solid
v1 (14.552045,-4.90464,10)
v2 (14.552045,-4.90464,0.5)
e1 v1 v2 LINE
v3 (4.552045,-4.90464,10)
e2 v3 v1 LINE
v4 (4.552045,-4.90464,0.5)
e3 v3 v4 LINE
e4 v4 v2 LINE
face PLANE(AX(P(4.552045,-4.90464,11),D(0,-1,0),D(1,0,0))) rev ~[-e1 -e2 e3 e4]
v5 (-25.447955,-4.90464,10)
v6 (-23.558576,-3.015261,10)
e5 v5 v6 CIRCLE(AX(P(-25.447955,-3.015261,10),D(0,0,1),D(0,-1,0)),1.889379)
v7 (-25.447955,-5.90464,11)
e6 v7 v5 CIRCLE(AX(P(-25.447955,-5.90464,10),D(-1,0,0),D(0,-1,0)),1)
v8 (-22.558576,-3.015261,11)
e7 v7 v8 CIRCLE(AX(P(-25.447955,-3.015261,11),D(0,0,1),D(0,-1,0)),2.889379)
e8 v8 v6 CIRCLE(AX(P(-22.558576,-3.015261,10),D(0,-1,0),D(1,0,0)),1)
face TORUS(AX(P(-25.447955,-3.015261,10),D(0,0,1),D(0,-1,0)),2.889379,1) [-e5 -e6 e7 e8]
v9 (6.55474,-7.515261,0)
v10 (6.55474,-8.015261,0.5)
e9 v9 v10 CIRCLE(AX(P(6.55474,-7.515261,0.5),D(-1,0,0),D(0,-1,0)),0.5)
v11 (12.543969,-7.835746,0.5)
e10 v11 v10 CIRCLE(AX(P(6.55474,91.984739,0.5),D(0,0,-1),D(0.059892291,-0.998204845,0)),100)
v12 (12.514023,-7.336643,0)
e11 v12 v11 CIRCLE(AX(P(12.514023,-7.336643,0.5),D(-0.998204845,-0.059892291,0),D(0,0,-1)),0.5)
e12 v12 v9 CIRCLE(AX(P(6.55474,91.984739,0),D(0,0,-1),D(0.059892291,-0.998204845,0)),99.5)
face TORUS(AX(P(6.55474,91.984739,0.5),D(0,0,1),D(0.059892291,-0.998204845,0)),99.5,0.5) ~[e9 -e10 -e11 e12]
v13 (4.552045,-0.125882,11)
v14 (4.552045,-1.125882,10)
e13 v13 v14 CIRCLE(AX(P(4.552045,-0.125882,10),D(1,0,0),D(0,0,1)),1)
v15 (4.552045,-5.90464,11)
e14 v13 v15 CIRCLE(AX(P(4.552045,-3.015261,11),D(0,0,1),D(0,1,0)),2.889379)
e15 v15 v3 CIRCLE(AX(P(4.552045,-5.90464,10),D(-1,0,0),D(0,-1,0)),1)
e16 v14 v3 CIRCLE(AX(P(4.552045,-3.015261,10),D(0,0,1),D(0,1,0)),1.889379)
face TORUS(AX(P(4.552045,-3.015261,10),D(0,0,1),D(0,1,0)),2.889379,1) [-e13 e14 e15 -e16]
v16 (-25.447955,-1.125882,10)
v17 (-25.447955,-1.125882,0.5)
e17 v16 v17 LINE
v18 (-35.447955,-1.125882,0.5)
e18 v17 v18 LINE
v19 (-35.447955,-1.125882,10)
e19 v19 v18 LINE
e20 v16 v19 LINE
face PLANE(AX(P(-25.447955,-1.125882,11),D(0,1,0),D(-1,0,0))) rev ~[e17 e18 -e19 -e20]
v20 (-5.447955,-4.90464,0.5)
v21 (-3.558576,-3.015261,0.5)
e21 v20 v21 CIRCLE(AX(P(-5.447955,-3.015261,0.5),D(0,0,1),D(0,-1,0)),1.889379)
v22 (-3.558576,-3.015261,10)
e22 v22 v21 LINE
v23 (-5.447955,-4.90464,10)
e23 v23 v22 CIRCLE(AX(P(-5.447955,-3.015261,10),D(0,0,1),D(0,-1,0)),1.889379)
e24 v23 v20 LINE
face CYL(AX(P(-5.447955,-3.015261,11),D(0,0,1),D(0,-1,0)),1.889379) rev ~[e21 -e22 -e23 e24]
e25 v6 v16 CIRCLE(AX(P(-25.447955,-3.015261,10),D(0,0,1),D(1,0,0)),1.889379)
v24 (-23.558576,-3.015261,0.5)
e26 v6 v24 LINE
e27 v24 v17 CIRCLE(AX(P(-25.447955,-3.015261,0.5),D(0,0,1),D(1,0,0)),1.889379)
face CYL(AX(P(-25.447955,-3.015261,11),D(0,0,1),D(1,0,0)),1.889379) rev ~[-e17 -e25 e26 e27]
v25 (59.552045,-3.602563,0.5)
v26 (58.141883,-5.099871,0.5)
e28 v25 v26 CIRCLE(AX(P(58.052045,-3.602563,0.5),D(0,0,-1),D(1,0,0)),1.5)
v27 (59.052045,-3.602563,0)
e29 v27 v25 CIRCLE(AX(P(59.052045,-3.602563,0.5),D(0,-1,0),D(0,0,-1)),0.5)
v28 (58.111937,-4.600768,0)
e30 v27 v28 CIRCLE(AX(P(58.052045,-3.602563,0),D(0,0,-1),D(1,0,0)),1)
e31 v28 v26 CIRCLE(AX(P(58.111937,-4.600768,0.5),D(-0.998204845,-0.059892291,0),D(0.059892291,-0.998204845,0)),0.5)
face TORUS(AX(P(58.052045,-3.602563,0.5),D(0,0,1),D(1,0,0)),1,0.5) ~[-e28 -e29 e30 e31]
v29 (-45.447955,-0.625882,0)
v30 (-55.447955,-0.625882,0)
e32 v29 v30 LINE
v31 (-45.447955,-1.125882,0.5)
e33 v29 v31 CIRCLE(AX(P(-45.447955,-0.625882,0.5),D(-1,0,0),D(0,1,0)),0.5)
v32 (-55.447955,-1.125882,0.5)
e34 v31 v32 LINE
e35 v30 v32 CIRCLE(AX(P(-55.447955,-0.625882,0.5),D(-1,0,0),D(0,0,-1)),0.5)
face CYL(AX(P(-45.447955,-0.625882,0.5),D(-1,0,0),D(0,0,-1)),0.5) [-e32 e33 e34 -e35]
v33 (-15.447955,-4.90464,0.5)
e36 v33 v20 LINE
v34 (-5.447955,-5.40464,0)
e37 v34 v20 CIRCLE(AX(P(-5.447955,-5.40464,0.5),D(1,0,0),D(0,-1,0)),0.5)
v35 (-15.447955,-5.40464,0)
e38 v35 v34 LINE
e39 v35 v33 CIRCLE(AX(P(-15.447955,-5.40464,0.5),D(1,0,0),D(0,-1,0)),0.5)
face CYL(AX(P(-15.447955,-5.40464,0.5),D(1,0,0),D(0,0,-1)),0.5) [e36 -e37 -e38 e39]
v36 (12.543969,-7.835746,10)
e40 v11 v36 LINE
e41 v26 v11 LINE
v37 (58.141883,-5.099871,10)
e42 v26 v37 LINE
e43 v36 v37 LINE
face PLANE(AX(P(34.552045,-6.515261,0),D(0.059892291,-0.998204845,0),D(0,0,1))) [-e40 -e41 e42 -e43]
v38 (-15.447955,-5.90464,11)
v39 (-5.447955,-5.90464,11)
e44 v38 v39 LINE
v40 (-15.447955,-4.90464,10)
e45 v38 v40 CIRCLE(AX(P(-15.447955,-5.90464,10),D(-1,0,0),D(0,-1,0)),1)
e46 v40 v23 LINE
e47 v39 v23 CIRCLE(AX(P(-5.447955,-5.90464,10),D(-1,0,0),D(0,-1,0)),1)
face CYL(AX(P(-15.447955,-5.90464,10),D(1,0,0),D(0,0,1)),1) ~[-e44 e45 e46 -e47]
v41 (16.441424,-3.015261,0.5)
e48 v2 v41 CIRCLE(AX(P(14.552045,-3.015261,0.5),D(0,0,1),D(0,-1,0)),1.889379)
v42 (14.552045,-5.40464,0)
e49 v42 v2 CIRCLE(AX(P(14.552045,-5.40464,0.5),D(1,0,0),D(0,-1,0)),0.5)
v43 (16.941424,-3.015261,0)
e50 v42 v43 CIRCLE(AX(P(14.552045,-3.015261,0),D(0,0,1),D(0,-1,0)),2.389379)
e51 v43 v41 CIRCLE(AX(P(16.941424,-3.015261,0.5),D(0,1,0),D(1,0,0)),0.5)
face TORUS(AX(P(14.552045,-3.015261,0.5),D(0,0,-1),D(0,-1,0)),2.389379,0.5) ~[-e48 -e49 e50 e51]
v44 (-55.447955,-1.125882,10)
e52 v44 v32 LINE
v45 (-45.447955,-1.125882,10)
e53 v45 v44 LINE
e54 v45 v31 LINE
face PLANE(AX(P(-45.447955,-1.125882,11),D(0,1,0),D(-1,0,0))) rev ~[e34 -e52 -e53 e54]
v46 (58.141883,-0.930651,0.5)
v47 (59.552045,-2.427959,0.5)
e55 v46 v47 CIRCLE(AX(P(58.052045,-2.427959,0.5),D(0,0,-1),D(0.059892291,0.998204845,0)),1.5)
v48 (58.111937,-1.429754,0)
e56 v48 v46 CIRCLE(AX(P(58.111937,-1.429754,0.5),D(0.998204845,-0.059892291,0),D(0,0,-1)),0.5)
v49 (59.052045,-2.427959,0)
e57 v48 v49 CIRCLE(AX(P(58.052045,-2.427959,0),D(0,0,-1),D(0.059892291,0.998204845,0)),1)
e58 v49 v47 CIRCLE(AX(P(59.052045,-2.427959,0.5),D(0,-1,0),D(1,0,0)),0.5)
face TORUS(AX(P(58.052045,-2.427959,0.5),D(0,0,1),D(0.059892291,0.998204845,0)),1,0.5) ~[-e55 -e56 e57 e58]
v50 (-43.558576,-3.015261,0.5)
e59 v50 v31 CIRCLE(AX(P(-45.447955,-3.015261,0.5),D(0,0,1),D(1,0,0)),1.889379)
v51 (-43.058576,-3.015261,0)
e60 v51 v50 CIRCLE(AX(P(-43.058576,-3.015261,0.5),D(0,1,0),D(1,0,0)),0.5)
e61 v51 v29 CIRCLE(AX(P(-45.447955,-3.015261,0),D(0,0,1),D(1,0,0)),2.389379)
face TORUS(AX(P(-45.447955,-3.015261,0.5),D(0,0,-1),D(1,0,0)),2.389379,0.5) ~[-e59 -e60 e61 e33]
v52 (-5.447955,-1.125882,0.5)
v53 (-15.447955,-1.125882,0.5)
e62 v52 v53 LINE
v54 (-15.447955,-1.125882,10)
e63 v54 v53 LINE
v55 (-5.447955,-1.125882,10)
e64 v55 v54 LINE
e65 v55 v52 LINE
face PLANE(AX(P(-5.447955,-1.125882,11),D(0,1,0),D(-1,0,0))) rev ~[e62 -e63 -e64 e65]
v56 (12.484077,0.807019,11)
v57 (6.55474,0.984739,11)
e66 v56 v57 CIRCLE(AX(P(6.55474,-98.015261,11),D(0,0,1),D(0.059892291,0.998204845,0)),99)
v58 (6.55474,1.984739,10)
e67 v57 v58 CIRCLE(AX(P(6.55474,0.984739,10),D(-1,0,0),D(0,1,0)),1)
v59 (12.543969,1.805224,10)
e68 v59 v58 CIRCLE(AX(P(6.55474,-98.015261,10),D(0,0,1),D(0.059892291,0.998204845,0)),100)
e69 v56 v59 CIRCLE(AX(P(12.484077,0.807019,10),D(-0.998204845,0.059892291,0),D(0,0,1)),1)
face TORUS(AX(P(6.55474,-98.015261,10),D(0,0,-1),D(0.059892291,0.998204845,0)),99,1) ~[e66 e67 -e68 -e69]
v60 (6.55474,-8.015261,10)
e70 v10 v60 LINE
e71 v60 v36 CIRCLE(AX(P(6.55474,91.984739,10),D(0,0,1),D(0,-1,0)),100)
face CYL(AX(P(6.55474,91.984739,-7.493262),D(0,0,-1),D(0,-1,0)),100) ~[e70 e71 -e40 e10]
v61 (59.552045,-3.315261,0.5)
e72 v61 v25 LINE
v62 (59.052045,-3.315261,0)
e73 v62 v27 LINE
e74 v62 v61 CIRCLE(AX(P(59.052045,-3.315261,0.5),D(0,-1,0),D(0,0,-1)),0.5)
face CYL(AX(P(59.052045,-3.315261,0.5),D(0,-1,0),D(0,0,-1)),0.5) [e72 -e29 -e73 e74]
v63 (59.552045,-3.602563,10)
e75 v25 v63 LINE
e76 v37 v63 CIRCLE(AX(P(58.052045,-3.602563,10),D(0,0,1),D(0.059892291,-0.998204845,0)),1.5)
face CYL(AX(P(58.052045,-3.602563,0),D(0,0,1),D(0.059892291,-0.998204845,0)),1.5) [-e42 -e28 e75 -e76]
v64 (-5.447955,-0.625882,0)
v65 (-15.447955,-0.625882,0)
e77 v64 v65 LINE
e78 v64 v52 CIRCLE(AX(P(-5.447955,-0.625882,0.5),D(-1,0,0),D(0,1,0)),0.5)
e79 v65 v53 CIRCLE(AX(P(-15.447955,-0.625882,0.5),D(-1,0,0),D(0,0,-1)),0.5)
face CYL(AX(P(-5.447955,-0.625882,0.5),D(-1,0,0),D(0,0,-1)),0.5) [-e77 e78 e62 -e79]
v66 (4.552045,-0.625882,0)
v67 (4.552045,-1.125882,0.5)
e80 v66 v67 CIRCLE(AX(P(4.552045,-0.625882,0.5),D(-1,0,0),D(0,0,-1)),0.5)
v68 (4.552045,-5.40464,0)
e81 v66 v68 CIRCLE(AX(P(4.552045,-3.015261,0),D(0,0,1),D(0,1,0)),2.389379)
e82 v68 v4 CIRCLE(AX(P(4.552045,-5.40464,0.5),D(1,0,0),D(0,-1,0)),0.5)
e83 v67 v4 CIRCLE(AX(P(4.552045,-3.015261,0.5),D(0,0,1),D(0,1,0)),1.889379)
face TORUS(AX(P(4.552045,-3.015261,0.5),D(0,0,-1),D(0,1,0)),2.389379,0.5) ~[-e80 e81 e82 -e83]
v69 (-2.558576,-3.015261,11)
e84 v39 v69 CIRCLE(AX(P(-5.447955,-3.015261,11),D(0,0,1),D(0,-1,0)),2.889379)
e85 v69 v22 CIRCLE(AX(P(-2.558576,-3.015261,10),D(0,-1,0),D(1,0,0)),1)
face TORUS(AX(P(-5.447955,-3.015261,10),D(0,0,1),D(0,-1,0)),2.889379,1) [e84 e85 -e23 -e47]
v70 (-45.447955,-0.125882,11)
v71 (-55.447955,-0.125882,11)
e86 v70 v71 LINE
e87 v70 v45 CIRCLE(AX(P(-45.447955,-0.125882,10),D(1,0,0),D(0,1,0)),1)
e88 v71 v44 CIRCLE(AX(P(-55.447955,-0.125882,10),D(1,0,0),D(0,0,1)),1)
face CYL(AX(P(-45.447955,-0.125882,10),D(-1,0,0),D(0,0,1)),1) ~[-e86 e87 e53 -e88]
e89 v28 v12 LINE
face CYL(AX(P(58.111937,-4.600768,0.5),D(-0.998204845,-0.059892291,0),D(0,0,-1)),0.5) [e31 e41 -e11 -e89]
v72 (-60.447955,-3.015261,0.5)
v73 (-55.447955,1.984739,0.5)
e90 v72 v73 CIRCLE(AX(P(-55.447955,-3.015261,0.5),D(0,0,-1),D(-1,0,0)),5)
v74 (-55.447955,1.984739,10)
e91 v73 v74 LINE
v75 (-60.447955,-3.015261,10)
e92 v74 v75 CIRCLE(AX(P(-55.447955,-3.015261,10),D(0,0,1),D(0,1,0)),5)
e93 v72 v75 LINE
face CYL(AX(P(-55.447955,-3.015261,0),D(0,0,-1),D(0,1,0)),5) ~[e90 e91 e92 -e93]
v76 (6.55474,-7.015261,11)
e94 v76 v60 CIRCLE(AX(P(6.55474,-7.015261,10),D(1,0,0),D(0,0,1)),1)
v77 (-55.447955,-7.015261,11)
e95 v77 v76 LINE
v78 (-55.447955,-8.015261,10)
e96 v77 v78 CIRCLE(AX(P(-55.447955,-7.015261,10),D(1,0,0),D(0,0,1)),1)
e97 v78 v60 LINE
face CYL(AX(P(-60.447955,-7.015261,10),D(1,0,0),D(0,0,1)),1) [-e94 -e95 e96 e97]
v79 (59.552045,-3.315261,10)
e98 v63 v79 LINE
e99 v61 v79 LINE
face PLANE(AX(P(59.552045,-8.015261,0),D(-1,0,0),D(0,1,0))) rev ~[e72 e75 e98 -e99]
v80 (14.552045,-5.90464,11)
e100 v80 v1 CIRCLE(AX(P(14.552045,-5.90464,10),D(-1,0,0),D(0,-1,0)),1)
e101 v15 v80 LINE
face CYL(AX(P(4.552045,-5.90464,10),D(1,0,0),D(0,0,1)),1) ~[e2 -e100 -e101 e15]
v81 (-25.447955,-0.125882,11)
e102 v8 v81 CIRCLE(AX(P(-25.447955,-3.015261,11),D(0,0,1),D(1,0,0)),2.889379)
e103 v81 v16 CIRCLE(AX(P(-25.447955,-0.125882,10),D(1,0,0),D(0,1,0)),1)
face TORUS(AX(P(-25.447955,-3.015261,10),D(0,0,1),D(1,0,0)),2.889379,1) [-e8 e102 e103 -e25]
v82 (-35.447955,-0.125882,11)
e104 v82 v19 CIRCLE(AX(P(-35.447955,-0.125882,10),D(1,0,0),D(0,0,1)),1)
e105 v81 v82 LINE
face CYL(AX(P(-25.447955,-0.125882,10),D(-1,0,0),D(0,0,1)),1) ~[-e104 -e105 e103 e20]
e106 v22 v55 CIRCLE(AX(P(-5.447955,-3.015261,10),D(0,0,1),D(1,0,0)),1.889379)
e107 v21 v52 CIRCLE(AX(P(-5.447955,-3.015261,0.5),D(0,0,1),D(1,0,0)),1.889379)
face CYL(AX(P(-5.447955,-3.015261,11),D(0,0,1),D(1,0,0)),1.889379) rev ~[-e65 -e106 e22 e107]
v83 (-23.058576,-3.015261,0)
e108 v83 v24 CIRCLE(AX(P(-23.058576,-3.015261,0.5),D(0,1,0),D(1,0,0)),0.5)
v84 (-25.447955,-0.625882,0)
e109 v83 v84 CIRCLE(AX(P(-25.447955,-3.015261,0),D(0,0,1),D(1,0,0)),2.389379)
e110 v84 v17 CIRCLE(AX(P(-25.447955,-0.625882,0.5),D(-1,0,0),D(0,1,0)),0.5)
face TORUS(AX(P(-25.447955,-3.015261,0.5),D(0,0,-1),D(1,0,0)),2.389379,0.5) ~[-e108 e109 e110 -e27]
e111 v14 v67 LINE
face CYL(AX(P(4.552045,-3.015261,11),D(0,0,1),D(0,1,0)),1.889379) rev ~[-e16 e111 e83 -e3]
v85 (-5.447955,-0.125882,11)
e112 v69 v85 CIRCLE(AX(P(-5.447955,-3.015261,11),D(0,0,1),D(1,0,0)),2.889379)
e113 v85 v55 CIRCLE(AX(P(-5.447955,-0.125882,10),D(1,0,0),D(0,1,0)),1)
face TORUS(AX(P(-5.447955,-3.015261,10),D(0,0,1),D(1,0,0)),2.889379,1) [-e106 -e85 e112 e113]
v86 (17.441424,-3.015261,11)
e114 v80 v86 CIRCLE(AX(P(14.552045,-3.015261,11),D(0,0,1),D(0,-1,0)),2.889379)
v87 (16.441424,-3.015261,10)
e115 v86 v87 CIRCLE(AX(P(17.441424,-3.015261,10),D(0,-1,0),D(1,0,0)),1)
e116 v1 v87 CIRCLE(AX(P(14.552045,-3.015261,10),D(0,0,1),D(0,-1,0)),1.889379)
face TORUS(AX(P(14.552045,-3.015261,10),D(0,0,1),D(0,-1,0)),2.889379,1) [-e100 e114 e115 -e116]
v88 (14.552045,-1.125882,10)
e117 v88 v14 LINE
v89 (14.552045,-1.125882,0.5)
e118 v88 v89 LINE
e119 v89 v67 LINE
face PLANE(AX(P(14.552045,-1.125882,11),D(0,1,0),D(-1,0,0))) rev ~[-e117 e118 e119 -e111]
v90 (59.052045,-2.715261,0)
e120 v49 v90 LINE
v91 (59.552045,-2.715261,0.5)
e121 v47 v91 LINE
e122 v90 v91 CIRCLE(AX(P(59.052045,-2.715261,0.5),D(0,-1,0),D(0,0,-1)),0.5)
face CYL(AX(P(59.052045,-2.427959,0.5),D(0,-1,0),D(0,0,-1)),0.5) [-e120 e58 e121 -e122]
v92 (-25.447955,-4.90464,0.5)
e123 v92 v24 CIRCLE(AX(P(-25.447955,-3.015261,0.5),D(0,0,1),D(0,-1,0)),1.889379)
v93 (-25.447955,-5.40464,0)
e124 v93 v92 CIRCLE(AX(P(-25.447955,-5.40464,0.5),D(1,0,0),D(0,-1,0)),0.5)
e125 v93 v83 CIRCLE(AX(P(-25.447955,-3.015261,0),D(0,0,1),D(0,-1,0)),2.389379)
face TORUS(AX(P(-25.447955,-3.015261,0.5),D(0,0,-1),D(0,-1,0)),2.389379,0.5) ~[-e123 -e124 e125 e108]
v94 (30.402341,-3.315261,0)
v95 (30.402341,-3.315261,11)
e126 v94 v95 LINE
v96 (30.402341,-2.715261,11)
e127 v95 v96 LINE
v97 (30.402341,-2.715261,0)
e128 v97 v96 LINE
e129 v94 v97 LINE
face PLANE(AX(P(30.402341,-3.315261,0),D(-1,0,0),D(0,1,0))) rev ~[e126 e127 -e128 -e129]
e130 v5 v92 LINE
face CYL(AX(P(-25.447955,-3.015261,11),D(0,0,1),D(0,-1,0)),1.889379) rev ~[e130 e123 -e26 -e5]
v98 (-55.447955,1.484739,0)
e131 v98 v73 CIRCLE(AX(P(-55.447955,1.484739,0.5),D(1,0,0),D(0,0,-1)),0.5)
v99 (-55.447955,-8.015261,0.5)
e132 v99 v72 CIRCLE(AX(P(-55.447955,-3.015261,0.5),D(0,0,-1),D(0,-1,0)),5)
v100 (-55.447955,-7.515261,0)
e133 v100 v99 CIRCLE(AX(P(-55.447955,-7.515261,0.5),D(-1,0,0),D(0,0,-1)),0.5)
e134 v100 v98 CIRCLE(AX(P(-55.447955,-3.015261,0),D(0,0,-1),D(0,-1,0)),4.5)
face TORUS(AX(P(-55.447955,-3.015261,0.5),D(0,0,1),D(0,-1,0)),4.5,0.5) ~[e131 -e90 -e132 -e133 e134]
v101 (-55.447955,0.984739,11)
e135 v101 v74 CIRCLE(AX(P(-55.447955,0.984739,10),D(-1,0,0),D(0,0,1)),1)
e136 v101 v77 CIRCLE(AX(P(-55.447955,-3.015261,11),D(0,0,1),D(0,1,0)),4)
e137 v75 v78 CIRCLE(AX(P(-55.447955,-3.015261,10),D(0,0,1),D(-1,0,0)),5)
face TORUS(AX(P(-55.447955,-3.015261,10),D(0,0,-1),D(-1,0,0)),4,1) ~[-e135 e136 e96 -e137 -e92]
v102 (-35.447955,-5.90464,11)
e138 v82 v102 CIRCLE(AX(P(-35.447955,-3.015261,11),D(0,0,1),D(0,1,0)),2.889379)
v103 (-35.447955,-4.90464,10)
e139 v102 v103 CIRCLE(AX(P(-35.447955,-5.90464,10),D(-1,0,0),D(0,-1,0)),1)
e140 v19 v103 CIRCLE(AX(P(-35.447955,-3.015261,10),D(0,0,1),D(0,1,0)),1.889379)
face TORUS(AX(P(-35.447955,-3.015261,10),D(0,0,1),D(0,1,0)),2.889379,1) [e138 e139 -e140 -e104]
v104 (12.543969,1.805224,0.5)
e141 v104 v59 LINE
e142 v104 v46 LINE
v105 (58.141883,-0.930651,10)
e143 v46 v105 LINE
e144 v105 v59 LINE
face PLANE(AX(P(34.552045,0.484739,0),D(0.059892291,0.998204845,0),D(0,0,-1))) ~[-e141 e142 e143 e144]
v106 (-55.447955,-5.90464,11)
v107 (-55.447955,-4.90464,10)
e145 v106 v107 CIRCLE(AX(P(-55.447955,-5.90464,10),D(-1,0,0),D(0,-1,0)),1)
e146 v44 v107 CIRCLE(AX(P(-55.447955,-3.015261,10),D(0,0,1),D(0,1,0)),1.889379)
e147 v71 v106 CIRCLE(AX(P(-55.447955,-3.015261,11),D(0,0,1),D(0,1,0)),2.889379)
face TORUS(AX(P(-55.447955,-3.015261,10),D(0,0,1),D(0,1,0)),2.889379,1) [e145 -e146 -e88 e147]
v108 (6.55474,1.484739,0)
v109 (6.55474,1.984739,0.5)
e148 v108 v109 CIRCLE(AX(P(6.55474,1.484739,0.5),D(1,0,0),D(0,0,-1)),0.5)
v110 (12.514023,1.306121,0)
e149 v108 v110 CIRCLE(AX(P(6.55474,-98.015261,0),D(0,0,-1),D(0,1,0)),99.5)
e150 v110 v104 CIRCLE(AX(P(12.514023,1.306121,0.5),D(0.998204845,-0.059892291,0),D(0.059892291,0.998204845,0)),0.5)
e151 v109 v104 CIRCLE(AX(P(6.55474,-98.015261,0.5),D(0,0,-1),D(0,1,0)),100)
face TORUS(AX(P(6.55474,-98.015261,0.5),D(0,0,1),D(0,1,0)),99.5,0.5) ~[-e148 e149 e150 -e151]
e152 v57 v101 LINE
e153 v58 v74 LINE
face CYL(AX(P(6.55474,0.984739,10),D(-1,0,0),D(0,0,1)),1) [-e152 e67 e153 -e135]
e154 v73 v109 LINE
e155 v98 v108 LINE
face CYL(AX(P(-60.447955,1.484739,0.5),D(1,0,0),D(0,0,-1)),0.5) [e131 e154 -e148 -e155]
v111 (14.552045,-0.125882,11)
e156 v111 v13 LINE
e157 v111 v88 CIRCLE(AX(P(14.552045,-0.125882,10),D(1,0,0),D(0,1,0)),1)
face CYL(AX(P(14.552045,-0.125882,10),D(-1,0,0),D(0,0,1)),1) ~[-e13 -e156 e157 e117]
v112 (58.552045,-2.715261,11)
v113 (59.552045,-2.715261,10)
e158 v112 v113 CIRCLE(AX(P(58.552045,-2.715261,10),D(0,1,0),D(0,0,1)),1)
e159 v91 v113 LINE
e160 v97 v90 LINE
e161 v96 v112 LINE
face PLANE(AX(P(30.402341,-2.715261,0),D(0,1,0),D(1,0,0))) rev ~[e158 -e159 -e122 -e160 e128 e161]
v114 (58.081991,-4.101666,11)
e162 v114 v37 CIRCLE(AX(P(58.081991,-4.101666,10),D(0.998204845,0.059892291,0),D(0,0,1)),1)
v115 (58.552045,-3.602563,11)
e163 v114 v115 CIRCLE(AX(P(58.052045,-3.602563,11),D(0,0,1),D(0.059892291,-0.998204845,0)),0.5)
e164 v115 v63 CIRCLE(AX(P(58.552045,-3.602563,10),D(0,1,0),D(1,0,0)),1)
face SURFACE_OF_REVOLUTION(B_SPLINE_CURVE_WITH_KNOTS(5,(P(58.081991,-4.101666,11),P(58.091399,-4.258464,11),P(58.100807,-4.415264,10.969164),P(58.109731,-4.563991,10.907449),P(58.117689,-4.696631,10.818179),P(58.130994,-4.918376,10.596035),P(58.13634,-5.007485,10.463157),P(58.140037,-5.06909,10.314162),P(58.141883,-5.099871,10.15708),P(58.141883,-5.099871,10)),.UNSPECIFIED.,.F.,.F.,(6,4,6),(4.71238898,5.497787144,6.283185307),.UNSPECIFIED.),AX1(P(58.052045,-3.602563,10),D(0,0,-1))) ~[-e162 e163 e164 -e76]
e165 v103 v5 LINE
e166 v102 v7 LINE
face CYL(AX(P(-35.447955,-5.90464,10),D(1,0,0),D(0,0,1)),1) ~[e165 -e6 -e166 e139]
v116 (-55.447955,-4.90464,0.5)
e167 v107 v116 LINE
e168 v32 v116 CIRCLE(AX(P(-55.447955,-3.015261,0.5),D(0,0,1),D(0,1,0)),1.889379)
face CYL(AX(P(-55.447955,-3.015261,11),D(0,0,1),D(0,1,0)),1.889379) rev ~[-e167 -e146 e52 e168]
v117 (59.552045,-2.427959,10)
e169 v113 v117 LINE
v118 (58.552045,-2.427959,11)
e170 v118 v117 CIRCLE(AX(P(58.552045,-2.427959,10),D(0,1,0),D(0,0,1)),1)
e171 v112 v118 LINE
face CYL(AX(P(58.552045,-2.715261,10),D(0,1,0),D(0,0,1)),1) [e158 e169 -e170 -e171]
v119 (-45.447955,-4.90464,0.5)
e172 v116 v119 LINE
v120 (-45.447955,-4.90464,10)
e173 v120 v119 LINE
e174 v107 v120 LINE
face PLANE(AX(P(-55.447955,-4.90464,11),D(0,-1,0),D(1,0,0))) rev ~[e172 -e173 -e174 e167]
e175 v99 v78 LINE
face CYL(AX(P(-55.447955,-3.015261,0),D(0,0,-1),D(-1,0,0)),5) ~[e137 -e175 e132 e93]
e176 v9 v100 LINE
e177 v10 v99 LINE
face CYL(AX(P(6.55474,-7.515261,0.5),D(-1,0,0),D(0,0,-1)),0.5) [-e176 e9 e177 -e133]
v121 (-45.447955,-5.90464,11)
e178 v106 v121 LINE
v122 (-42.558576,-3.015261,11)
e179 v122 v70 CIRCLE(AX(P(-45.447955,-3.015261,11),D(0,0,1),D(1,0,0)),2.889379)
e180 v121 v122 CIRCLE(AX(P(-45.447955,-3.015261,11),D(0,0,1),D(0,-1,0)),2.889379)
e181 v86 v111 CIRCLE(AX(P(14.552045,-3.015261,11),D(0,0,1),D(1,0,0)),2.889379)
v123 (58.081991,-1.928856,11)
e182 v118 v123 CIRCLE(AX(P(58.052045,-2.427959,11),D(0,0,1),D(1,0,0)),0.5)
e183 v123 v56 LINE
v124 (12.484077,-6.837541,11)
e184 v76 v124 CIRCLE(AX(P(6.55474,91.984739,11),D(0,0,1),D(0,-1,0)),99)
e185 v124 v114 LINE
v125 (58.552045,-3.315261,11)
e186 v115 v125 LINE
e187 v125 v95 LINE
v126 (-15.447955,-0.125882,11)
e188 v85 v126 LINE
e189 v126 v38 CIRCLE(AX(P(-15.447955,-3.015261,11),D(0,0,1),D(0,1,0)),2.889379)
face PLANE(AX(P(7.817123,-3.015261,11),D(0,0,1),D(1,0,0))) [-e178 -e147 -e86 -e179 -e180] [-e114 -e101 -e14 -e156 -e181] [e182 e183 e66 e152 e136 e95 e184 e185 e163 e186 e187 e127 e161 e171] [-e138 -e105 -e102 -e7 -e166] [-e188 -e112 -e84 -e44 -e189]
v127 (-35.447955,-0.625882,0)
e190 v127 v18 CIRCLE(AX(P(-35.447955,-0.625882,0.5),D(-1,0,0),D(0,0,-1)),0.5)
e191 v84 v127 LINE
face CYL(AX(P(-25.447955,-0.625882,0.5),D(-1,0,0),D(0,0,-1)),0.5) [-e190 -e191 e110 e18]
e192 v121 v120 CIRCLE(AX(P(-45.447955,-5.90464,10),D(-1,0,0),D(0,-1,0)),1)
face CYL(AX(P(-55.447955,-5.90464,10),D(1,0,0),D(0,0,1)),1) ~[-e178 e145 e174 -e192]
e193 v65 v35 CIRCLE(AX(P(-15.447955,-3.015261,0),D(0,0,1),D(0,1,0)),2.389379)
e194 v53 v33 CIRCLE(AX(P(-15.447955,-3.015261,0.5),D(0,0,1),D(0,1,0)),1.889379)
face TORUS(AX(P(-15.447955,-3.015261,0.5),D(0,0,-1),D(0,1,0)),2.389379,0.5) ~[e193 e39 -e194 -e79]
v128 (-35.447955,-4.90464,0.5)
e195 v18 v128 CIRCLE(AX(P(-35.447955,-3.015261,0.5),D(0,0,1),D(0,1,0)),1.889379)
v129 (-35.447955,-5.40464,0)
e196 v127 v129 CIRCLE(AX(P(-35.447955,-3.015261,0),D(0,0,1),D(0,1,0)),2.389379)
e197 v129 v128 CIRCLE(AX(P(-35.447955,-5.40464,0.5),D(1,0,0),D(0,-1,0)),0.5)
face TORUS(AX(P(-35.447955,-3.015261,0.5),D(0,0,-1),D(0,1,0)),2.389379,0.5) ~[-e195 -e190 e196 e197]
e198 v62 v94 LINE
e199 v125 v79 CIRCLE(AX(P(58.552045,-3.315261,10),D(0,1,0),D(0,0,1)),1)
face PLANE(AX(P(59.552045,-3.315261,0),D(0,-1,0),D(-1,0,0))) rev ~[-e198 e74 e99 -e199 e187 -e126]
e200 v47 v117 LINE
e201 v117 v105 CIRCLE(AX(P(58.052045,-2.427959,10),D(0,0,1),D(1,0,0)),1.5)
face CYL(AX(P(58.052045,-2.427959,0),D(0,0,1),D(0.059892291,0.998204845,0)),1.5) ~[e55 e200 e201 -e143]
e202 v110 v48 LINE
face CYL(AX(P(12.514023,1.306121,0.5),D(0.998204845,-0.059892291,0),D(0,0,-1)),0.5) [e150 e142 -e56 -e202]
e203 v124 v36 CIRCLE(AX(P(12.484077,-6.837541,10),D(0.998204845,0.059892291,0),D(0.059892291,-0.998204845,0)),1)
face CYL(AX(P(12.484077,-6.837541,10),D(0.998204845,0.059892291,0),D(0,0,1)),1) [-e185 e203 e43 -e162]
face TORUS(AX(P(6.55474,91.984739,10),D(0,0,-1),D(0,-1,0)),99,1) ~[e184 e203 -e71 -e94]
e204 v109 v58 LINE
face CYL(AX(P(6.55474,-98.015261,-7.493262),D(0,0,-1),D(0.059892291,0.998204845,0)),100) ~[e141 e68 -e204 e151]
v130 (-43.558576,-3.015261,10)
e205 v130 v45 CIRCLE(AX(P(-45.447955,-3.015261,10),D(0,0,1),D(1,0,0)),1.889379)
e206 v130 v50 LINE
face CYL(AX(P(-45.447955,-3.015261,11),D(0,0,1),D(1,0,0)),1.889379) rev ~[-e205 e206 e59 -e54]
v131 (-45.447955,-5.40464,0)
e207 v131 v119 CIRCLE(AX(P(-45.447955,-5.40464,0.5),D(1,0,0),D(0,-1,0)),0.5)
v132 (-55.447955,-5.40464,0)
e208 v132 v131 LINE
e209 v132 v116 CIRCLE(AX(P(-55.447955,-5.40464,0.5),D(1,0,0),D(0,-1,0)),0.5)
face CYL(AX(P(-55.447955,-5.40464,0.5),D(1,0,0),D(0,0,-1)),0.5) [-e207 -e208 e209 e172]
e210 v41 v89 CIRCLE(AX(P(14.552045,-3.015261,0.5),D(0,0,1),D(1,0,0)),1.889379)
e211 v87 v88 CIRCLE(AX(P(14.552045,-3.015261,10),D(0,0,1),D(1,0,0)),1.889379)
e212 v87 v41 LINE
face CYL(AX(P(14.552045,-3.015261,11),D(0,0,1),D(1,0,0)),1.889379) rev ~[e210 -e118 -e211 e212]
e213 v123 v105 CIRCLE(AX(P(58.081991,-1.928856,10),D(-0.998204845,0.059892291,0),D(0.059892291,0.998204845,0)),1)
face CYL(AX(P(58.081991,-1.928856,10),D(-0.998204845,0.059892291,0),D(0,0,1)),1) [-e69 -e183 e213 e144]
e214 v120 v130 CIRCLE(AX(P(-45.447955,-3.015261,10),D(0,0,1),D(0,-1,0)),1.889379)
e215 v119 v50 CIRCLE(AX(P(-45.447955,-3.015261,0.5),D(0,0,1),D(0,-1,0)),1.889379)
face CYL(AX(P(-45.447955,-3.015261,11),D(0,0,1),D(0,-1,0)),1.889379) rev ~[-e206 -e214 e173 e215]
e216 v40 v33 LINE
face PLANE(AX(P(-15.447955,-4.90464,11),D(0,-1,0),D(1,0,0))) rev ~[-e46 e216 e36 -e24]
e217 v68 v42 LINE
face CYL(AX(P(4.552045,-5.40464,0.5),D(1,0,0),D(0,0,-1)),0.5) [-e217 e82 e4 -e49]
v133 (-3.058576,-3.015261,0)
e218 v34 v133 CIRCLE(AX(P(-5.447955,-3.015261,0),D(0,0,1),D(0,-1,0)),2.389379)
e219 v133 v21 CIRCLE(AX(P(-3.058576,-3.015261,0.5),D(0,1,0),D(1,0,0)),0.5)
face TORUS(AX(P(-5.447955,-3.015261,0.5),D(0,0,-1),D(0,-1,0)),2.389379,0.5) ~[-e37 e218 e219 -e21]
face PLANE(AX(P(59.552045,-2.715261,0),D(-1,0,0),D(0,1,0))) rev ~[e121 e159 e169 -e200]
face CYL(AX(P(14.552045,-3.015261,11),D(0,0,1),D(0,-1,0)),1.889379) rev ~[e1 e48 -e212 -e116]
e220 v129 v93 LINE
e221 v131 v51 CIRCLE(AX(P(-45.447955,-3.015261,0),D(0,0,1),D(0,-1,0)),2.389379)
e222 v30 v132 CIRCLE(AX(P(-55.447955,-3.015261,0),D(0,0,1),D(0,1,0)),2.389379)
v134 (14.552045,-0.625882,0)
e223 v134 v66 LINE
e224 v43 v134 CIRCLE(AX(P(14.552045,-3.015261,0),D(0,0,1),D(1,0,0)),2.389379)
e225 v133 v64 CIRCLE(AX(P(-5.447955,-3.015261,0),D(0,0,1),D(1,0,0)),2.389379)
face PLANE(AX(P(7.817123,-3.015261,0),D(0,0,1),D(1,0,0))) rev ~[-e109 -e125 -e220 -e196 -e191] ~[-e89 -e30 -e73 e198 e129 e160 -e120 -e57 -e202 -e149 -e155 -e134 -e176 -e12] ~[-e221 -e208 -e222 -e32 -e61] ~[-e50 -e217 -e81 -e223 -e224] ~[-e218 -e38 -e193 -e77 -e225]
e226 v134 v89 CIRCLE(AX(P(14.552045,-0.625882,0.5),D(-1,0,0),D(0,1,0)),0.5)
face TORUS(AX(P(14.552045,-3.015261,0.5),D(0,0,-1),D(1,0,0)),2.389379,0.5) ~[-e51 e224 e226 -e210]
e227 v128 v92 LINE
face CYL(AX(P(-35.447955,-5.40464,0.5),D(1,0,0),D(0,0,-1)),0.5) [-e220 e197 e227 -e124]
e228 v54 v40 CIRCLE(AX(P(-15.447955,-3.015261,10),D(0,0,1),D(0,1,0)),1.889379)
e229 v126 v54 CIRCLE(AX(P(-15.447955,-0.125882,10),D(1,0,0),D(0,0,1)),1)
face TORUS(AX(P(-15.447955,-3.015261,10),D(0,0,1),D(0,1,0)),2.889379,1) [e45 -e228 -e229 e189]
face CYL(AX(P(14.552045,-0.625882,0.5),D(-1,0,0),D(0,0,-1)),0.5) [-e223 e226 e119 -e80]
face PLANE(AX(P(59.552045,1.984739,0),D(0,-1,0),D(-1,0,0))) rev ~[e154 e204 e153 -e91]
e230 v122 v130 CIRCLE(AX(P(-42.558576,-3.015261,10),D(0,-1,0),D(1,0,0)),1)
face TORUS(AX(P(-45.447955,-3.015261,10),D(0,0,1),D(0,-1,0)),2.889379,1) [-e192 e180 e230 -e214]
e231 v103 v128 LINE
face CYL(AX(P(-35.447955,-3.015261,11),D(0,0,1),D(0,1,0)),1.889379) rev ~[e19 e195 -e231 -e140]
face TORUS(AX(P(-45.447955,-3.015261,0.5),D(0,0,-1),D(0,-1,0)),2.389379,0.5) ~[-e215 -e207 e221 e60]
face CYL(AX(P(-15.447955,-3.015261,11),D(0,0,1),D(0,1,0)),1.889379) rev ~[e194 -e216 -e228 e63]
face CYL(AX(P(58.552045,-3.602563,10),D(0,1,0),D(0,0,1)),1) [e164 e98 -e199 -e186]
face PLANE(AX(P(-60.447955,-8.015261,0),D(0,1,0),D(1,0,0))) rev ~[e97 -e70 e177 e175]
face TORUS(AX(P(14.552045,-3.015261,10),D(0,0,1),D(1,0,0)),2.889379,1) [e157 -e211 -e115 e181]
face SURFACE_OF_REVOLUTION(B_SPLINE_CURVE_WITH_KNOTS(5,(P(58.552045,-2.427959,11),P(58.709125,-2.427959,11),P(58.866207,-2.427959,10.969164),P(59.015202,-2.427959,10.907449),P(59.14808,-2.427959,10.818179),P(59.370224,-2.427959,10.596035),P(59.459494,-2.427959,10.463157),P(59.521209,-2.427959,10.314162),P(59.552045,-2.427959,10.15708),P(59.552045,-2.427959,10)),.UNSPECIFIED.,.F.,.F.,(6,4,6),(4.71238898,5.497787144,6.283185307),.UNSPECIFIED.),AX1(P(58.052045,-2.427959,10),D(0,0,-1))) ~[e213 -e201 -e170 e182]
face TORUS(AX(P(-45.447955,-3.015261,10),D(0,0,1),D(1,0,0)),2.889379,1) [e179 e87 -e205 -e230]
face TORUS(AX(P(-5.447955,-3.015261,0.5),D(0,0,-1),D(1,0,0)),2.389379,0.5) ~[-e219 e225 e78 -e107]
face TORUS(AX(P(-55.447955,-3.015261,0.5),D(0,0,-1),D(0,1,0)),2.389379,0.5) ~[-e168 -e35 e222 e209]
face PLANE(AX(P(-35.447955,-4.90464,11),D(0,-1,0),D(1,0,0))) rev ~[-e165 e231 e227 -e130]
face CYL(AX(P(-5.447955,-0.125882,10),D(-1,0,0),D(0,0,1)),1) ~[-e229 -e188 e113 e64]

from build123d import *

# Parameters (mm, degrees)
F1_DEPTH      = 11
F2_SIZE2      = 50
F2_SIZE       = 3
F3_SIZE2      = 50
F3_SIZE       = 3
F4_R          = 1.5
F5_T1_DEPTH   = 25.9865242455
F7_DEPTH      = 25
F8_R          = 0.5
F9_R          = 1
F10_T1_DEPTH  = 11
F10_T4_ANGLE  = 90
F10_T6_ANGLE  = 90
F10_T8_ANGLE  = 90
F10_T10_ANGLE = 90


# Not quite as in the source:
# - a fillet or chamfer that OpenCascade refuses, or shapes differently, is made with other operations: its cross-section is extruded or revolved along the edge and cut away or added


with BuildPart() as f1:
    # F0 (on Top) → F1 (new body)
    with BuildSketch(Plane.XY):
        Polygon((59.5520450175, 1.9847389825), (-60.4479549825, 1.9847389825), (-60.4479549825, -8.0152610175), (59.5520450175, -8.0152610175), (59.5520450175, -3.3152610175), (30.4023410931, -3.3152610175), (30.4023410931, -2.7152610175), (59.5520450175, -2.7152610175), align=None)
    extrude(amount=F1_DEPTH)

    # F2
    f2_edges = [f1.edges().sort_by_distance(p)[0] for p in [
        (59.552045, -8.015261, 5.5),
    ]]
    f2_side = f1.faces().sort_by_distance((59.552045, -5.665261, 5.5))[0]
    chamfer(f2_edges, length=F2_SIZE, length2=F2_SIZE2, reference=f2_side)

    # F3
    f3_edges = [f1.edges().sort_by_distance(p)[0] for p in [
        (59.552045, 1.984739, 5.5),
    ]]
    f3_side = f1.faces().sort_by_distance((59.552045, -0.365261, 5.5))[0]
    chamfer(f3_edges, length=F3_SIZE, length2=F3_SIZE2, reference=f3_side)

    # F4
    f4_edges = [f1.edges().sort_by_distance(p)[0] for p in [
        (59.552045, -1.015261, 5.5),
        (59.552045, -5.015261, 5.5),
    ]]
    fillet(f4_edges, radius=F4_R)

    # F5: fillet of radius 100 on 2 edges, made by hand

    # F5_s2 → F5_t1 (cut)
    with BuildSketch(Plane.XY.offset(-7.4932621227)):
        with BuildLine():
            ThreePointArc((6.5547401684, -8.0152610175), (9.5506995592, -7.9703720791), (12.5439692412, -7.8357455641))
            Line((12.5439692412, -7.8357455641), (9.5520450175, -8.0152610175))
            Line((9.5520450175, -8.0152610175), (6.5547401684, -8.0152610175))
        make_face()
        with BuildLine():
            ThreePointArc((12.5439692412, 1.805223529), (9.5506995592, 1.939850044), (6.5547401684, 1.9847389825))
            Line((6.5547401684, 1.9847389825), (9.5520450175, 1.9847389825))
            Line((9.5520450175, 1.9847389825), (12.5439692412, 1.805223529))
        make_face()
    extrude(amount=F5_T1_DEPTH, mode=Mode.SUBTRACT)

    # F6 (on face) → F7 (cut)
    with BuildSketch(Plane.XY.offset(11)):
        with BuildLine():
            ThreePointArc((-55.4479549825, -4.9046398905), (-54.1119623692, -4.3512536308), (-53.5585761096, -3.0152610175))
            ThreePointArc((-53.5585761096, -3.0152610175), (-54.1119623692, -1.6792684042), (-55.4479549825, -1.1258821446))
            ThreePointArc((-55.4479549825, -1.1258821446), (-57.3373338555, -3.0152610175), (-55.4479549825, -4.9046398905))
        make_face()
        with BuildLine():
            ThreePointArc((-55.4479549825, -1.1258821446), (-54.1119623692, -1.6792684042), (-53.5585761096, -3.0152610175))
            ThreePointArc((-53.5585761096, -3.0152610175), (-54.1119623692, -4.3512536308), (-55.4479549825, -4.9046398905))
            Line((-55.4479549825, -4.9046398905), (-45.4479549825, -4.9046398905))
            ThreePointArc((-45.4479549825, -4.9046398905), (-47.3373338555, -3.0152610175), (-45.4479549825, -1.1258821446))
            Line((-45.4479549825, -1.1258821446), (-55.4479549825, -1.1258821446))
        make_face()
        with BuildLine():
            ThreePointArc((-43.5585761096, -3.0152610175), (-44.1119623692, -1.6792684042), (-45.4479549825, -1.1258821446))
            ThreePointArc((-45.4479549825, -1.1258821446), (-47.3373338555, -3.0152610175), (-45.4479549825, -4.9046398905))
            ThreePointArc((-45.4479549825, -4.9046398905), (-44.1119623692, -4.3512536308), (-43.5585761096, -3.0152610175))
        make_face()
        with BuildLine():
            ThreePointArc((-35.4479549825, -4.9046398905), (-34.1119623692, -4.3512536308), (-33.5585761096, -3.0152610175))
            ThreePointArc((-33.5585761096, -3.0152610175), (-34.1119623692, -1.6792684042), (-35.4479549825, -1.1258821446))
            ThreePointArc((-35.4479549825, -1.1258821446), (-37.3373338555, -3.0152610175), (-35.4479549825, -4.9046398905))
        make_face()
        with BuildLine():
            ThreePointArc((-35.4479549825, -1.1258821446), (-34.1119623692, -1.6792684042), (-33.5585761096, -3.0152610175))
            ThreePointArc((-33.5585761096, -3.0152610175), (-34.1119623692, -4.3512536308), (-35.4479549825, -4.9046398905))
            Line((-35.4479549825, -4.9046398905), (-25.4479549825, -4.9046398905))
            ThreePointArc((-25.4479549825, -4.9046398905), (-27.3373338555, -3.0152610175), (-25.4479549825, -1.1258821446))
            Line((-25.4479549825, -1.1258821446), (-35.4479549825, -1.1258821446))
        make_face()
        with BuildLine():
            ThreePointArc((-23.5585761096, -3.0152610175), (-24.1119623692, -1.6792684042), (-25.4479549825, -1.1258821446))
            ThreePointArc((-25.4479549825, -1.1258821446), (-27.3373338555, -3.0152610175), (-25.4479549825, -4.9046398905))
            ThreePointArc((-25.4479549825, -4.9046398905), (-24.1119623692, -4.3512536308), (-23.5585761096, -3.0152610175))
        make_face()
        with BuildLine():
            ThreePointArc((-15.4479549825, -4.9046398905), (-14.1119623692, -4.3512536308), (-13.5585761096, -3.0152610175))
            ThreePointArc((-13.5585761096, -3.0152610175), (-14.1119623692, -1.6792684042), (-15.4479549825, -1.1258821446))
            ThreePointArc((-15.4479549825, -1.1258821446), (-17.3373338555, -3.0152610175), (-15.4479549825, -4.9046398905))
        make_face()
        with BuildLine():
            ThreePointArc((-15.4479549825, -1.1258821446), (-14.1119623692, -1.6792684042), (-13.5585761096, -3.0152610175))
            ThreePointArc((-13.5585761096, -3.0152610175), (-14.1119623692, -4.3512536308), (-15.4479549825, -4.9046398905))
            Line((-15.4479549825, -4.9046398905), (-5.4479549825, -4.9046398905))
            ThreePointArc((-5.4479549825, -4.9046398905), (-7.3373338555, -3.0152610175), (-5.4479549825, -1.1258821446))
            Line((-5.4479549825, -1.1258821446), (-15.4479549825, -1.1258821446))
        make_face()
        with BuildLine():
            ThreePointArc((-3.5585761096, -3.0152610175), (-4.1119623692, -1.6792684042), (-5.4479549825, -1.1258821446))
            ThreePointArc((-5.4479549825, -1.1258821446), (-7.3373338555, -3.0152610175), (-5.4479549825, -4.9046398905))
            ThreePointArc((-5.4479549825, -4.9046398905), (-4.1119623692, -4.3512536308), (-3.5585761096, -3.0152610175))
        make_face()
        with BuildLine():
            ThreePointArc((4.5520450175, -4.9046398905), (5.8880376308, -4.3512536308), (6.4414238904, -3.0152610175))
            ThreePointArc((6.4414238904, -3.0152610175), (5.8880376308, -1.6792684042), (4.5520450175, -1.1258821446))
            ThreePointArc((4.5520450175, -1.1258821446), (2.6626661445, -3.0152610175), (4.5520450175, -4.9046398905))
        make_face()
        with BuildLine():
            ThreePointArc((4.5520450175, -1.1258821446), (5.8880376308, -1.6792684042), (6.4414238904, -3.0152610175))
            ThreePointArc((6.4414238904, -3.0152610175), (5.8880376308, -4.3512536308), (4.5520450175, -4.9046398905))
            Line((4.5520450175, -4.9046398905), (14.5520450175, -4.9046398905))
            ThreePointArc((14.5520450175, -4.9046398905), (12.6626661445, -3.0152610175), (14.5520450175, -1.1258821446))
            Line((14.5520450175, -1.1258821446), (4.5520450175, -1.1258821446))
        make_face()
        with BuildLine():
            ThreePointArc((16.4414238904, -3.0152610175), (15.8880376308, -1.6792684042), (14.5520450175, -1.1258821446))
            ThreePointArc((14.5520450175, -1.1258821446), (12.6626661445, -3.0152610175), (14.5520450175, -4.9046398905))
            ThreePointArc((14.5520450175, -4.9046398905), (15.8880376308, -4.3512536308), (16.4414238904, -3.0152610175))
        make_face()
    extrude(amount=-F7_DEPTH, mode=Mode.SUBTRACT)

    # F8
    f8_edges = [f1.edges().sort_by_distance(p)[0] for p in [
        (35.342926, -6.467808, 0),
        (9.5507, 1.93985, 0),
        (-60.447955, -3.015261, 0),
        (-43.558576, -3.015261, 0),
        (-23.558576, -3.015261, 0),
        (-3.558576, -3.015261, 0),
        (16.441424, -3.015261, 0),
    ]]
    fillet(f8_edges, radius=F8_R)

    # F9
    f9_edges = [f1.edges().sort_by_distance(p)[0] for p in [
        (-26.946607, 1.984739, 11),
        (-26.946607, -8.015261, 11),
        (-60.447955, -3.015261, 11),
        (-43.558576, -3.015261, 11),
        (-23.558576, -3.015261, 11),
        (-3.558576, -3.015261, 11),
        (16.441424, -3.015261, 11),
    ]]
    fillet(f9_edges, radius=F9_R)

    # F10: fillet of radius 5 on 2 edges, made by hand

    # F10_s2 → F10_t1 (cut)
    with BuildSketch(Plane.XY):
        with BuildLine():
            ThreePointArc((-55.4479549825, 1.9847389825), (-58.9834888885, 0.5202728884), (-60.4479549825, -3.0152610175))
            Line((-60.4479549825, -3.0152610175), (-60.4479549825, 1.9847389825))
            Line((-60.4479549825, 1.9847389825), (-55.4479549825, 1.9847389825))
        make_face()
        with BuildLine():
            ThreePointArc((-60.4479549825, -3.0152610175), (-58.9834888885, -6.5507949235), (-55.4479549825, -8.0152610175))
            Line((-55.4479549825, -8.0152610175), (-60.4479549825, -8.0152610175))
            Line((-60.4479549825, -8.0152610175), (-60.4479549825, -3.0152610175))
        make_face()
    extrude(amount=F10_T1_DEPTH, mode=Mode.SUBTRACT)

    # F10_s3 → F10_t4 (revolve, cut)
    with BuildSketch(Plane.YZ.offset(-55.4479549825)):
        with BuildLine():
            ThreePointArc((-7.5152610175, 0), (-7.8688144081, 0.1464466094), (-8.0152610175, 0.5))
            Line((-8.0152610175, 0.5), (-8.0152610175, 0))
            Line((-8.0152610175, 0), (-7.5152610175, 0))
        make_face()
    revolve(axis=Axis((-55.4479549825, -3.0152610175, 0), (0, 0, -1)), revolution_arc=F10_T4_ANGLE, mode=Mode.SUBTRACT)

    # F10_s5 → F10_t6 (revolve, cut)
    with BuildSketch(Plane.XZ.offset(3.0152610175)):
        with BuildLine():
            ThreePointArc((-59.4479549825, 11), (-60.1550617637, 10.7071067812), (-60.4479549825, 10))
            Line((-60.4479549825, 10), (-60.4479549825, 11))
            Line((-60.4479549825, 11), (-59.4479549825, 11))
        make_face()
    revolve(axis=Axis((-55.4479549825, -3.0152610175, 11), (0, 0, 1)), revolution_arc=F10_T6_ANGLE, mode=Mode.SUBTRACT)

    # F10_s7 → F10_t8 (revolve, cut)
    with BuildSketch(Plane.XZ.offset(3.0152610175)):
        with BuildLine():
            ThreePointArc((-59.9479549825, 0), (-60.3015083731, 0.1464466094), (-60.4479549825, 0.5))
            Line((-60.4479549825, 0.5), (-60.4479549825, 0))
            Line((-60.4479549825, 0), (-59.9479549825, 0))
        make_face()
    revolve(axis=Axis((-55.4479549825, -3.0152610175, 0), (0, 0, -1)), revolution_arc=F10_T8_ANGLE, mode=Mode.SUBTRACT)

    # F10_s9 → F10_t10 (revolve, cut)
    with BuildSketch(Plane.YZ.offset(-55.4479549825)):
        with BuildLine():
            ThreePointArc((0.9847389825, 11), (1.6918457637, 10.7071067812), (1.9847389825, 10))
            Line((1.9847389825, 10), (1.9847389825, 11))
            Line((1.9847389825, 11), (0.9847389825, 11))
        make_face()
    revolve(axis=Axis((-55.4479549825, -3.0152610175, 11), (0, 0, 1)), revolution_arc=F10_T10_ANGLE, mode=Mode.SUBTRACT)


solid = f1.part
